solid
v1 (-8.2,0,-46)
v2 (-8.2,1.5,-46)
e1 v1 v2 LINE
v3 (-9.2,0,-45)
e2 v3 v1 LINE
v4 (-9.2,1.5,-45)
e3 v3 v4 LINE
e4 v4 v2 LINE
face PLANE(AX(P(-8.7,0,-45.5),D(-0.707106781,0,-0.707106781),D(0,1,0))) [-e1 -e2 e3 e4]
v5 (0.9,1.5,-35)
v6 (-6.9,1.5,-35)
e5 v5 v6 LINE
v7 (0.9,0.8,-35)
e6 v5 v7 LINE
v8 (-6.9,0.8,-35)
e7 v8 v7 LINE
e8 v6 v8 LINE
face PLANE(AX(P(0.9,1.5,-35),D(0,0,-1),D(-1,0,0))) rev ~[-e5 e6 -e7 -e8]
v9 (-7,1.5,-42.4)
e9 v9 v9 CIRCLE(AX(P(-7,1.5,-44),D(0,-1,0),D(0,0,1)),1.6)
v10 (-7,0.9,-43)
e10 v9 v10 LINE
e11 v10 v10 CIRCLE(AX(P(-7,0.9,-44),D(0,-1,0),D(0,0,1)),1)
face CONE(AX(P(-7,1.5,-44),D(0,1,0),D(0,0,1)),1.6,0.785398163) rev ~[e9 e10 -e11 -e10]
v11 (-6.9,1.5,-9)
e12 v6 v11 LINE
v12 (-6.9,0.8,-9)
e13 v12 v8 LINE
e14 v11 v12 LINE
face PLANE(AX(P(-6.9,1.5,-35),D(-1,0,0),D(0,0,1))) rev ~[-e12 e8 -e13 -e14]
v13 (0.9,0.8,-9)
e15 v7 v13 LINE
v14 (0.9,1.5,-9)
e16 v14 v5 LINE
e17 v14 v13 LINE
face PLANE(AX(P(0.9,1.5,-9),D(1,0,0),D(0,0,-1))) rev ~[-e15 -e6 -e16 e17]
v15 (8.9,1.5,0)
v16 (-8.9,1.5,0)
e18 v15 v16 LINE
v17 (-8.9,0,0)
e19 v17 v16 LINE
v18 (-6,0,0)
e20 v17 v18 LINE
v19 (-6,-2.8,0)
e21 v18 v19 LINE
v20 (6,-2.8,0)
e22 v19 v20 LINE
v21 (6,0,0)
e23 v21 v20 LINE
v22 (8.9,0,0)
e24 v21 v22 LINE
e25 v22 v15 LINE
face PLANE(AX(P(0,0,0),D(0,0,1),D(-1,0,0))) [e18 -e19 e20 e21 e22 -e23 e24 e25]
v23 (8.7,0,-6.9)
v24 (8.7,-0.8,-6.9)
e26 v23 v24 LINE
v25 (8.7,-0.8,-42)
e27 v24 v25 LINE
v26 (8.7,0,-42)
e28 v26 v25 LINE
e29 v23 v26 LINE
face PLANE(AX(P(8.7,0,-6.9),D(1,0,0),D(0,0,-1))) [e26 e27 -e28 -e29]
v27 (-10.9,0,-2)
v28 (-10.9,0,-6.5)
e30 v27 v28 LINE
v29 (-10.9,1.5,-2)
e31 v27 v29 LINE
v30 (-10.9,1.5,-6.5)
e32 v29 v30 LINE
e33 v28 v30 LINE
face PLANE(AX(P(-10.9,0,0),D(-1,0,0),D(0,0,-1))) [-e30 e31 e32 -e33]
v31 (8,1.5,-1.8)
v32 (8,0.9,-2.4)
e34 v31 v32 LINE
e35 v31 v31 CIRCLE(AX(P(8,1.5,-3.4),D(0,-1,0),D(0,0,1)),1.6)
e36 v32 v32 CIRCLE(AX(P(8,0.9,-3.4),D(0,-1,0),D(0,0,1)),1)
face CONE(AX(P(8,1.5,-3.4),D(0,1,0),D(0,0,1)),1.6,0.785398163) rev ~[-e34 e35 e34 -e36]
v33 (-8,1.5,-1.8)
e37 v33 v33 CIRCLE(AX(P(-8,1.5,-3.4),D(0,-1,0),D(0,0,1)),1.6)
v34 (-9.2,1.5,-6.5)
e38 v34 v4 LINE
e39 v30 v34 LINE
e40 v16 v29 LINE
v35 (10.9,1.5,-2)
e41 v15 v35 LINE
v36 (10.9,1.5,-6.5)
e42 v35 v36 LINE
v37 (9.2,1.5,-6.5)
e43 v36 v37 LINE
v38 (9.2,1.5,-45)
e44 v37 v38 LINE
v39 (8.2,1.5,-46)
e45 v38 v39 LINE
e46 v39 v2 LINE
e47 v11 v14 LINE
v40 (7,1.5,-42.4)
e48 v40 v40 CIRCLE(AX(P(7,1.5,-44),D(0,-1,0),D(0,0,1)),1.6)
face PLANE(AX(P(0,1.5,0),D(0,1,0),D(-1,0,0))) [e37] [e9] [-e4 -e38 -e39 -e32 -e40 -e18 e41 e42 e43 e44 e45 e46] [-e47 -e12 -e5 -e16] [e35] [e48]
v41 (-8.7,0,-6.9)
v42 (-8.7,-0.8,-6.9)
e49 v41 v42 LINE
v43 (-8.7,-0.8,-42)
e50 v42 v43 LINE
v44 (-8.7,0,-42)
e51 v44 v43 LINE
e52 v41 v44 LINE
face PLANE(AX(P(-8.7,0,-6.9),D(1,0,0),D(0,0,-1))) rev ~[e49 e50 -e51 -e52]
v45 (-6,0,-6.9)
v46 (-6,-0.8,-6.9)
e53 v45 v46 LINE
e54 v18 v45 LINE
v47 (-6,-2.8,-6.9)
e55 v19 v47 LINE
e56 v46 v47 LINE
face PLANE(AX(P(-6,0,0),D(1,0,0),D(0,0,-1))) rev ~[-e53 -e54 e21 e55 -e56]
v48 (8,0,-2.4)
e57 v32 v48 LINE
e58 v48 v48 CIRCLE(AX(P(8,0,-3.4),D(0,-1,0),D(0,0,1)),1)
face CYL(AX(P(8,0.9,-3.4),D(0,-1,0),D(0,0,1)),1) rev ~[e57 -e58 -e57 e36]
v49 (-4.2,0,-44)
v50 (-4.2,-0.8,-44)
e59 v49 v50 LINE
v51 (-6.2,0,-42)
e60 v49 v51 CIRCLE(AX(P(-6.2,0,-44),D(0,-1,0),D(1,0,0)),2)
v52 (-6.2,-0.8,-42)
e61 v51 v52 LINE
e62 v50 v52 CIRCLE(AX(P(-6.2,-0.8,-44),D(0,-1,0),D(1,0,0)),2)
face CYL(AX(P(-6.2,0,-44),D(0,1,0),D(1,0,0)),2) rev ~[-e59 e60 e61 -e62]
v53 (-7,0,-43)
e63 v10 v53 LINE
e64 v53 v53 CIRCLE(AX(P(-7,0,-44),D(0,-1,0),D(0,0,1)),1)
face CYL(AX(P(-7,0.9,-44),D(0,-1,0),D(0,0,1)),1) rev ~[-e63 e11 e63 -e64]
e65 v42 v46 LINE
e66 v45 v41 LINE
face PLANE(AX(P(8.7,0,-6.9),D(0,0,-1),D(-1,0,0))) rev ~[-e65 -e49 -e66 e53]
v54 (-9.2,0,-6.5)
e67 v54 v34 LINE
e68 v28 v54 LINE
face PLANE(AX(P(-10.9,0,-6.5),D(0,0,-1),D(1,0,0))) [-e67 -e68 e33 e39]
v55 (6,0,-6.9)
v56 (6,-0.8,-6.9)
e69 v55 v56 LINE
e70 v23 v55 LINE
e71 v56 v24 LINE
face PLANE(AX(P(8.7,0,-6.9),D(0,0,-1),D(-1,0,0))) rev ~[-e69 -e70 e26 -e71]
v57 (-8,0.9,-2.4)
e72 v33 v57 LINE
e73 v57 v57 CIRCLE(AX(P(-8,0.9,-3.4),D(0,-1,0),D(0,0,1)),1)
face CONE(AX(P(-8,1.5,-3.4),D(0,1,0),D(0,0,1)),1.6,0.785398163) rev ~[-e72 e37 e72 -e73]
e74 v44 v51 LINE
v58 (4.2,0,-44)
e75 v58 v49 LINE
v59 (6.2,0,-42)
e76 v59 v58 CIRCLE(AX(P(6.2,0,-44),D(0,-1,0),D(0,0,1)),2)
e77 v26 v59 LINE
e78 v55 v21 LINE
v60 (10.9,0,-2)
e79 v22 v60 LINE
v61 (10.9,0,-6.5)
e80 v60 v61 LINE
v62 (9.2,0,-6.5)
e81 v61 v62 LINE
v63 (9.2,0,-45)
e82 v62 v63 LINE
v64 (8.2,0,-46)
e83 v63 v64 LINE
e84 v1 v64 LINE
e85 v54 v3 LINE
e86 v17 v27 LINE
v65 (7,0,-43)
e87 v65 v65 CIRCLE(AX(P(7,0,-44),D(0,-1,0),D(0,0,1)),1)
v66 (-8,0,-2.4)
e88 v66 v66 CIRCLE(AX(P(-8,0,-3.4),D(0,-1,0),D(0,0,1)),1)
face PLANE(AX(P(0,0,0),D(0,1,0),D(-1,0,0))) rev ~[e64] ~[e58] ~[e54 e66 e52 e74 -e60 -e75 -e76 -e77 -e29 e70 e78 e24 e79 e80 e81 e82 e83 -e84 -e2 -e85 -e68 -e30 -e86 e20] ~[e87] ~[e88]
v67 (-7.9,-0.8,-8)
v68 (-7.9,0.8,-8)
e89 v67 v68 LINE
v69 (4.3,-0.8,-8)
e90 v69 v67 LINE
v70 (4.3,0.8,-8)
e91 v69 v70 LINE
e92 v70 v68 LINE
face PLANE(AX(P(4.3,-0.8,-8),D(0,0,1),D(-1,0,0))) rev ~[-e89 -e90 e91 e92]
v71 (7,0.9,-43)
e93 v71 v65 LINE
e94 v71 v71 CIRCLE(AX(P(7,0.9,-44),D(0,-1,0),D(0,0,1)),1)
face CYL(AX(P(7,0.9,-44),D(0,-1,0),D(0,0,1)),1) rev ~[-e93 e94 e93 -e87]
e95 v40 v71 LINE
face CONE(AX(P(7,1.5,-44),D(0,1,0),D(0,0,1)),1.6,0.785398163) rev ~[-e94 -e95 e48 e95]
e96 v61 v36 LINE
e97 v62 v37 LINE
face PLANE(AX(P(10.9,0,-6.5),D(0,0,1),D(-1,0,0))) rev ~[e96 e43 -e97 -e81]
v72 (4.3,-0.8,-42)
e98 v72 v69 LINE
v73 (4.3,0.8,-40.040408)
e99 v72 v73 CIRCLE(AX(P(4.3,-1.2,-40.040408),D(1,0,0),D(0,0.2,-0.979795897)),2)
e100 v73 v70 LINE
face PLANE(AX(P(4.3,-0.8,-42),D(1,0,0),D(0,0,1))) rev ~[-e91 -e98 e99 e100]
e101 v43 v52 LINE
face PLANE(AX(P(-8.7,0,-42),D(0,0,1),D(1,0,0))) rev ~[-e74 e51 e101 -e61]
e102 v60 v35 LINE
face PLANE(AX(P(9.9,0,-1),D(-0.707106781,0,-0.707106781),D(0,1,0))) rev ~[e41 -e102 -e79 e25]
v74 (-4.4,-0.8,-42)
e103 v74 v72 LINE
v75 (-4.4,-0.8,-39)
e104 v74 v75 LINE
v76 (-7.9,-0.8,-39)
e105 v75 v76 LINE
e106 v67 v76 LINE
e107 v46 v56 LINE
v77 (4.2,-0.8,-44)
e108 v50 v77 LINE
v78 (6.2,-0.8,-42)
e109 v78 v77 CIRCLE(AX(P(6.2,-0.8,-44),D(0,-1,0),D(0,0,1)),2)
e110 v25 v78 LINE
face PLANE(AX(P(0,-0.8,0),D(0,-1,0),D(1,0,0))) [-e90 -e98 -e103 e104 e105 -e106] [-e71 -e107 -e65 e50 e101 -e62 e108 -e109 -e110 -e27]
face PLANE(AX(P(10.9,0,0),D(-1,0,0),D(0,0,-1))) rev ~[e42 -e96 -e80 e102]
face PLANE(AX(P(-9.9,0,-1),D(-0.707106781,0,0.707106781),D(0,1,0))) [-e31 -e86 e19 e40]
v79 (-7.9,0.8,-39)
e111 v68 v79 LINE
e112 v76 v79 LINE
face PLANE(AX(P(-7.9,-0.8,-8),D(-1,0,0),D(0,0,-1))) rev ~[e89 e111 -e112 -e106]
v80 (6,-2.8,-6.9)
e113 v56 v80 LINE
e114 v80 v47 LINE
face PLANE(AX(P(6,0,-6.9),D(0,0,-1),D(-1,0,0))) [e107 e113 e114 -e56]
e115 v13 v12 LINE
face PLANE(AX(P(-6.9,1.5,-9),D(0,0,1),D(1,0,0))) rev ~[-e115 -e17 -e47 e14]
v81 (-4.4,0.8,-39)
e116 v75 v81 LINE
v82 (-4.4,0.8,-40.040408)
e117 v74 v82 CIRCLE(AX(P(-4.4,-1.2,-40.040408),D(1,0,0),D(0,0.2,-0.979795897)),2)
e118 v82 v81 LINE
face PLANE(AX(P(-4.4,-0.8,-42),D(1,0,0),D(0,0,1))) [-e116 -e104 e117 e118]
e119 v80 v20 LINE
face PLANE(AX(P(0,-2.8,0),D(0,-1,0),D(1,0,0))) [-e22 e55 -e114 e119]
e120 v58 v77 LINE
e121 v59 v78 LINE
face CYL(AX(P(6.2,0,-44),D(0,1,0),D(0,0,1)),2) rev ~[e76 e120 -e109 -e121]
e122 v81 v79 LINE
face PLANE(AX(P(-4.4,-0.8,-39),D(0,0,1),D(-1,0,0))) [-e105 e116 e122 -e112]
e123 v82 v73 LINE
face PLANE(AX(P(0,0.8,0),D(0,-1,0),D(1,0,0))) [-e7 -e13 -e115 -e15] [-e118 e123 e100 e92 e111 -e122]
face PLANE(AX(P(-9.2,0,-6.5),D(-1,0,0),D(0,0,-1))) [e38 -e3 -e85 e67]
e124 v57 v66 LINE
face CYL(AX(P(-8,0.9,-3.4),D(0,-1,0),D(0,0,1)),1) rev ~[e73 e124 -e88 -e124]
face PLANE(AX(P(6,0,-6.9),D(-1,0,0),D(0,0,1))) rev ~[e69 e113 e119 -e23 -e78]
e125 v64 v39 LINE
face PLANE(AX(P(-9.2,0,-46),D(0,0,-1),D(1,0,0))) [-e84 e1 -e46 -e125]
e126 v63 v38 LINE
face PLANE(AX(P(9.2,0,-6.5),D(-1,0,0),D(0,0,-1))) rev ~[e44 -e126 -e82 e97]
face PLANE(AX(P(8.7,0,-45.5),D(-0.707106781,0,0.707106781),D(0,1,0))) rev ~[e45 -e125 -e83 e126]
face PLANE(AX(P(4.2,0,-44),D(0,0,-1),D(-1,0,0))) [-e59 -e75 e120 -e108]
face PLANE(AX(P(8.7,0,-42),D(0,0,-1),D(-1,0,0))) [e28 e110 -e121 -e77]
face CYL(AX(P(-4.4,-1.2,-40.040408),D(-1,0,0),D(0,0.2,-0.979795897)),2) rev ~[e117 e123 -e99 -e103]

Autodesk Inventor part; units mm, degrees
ref_plane "YZ Plane" through (0, 0, 0) normal (1, 0, 0) x (0, 1, 0)
ref_plane "XZ Plane" through (0, 0, 0) normal (0, 1, 0) x (-1, 0, 0)
ref_plane "XY Plane" through (0, 0, 0) normal (0, 0, 1) x (1, 0, 0)
sketch "Эскиз1" plane through (0, 0, 0) normal (0, 1, 0) x (-1, 0, 0)
  line L0 (0, 0) -> (0, -46)
  line L1 (0, 0) -> (10.9, 0)
  line L2 (10.9, 0) -> (10.9, -6.5)
  line L3 (10.9, -6.5) -> (9.2, -6.5)
  line L4 (9.2, -6.5) -> (9.2, -46)
  line L5 (9.2, -46) -> (0, -46)
  line L6 (0, 0) -> (-10.9, 0)
  line L7 (-10.9, 0) -> (-10.9, -6.5)
  line L8 (-10.9, -6.5) -> (-9.2, -6.5)
  line L9 (-9.2, -6.5) -> (-9.2, -46)
  line L10 (-9.2, -46) -> (0, -46)
  dimension "d1" = 6.5
  dimension "d2" = 46
  dimension "d3" = 18.4
  dimension "d4" = 21.8
extrude "Выдавливание1" add sketch "Эскиз1" along normal blind 1.5
chamfer "Фаска1" distance 2 angle 45 2 edges at (10.9, 0.75, 0) (-10.9, 0.75, 0)
chamfer "Фаска2" distance 1 angle 45 2 edges at (9.2, 0.75, -46) (-9.2, 0.75, -46)
sketch "Эскиз2" plane through (0, 1.5, 0) normal (0, 1, 0) x (1, 0, 0)
  line L0 (0, 0) -> (0, 46)
  line L1 (8.2, 46) -> (-8.2, 46) projected
  line L2 (-8.9, 0) -> (8.9, 0) projected
  point P0 (-8, 3.4)
  point P1 (8, 3.4)
  point P2 (-7, 44)
  point P3 (7, 44)
  dimension "d20" = 3.4
  dimension "d21" = 16
  dimension "d22" = 14
  dimension "d23" = 44
hole "Отверстие1" at (-8, 1.5, -3.4) at (8, 1.5, -3.4) at (-7, 1.5, -44) at (7, 1.5, -44) direction (0, -1, 0) diameter 2 end through all countersink diameter 3.2 countersink angle 90
sketch "Эскиз3" plane through (0, 0, 0) normal (0, -1, 0) x (1, 0, 0)
  line L0 (8.7, -6.9) -> (0, -6.9)
  line L1 (-8.9, 0) -> (8.9, 0) projected
  line L2 (8.7, -6.9) -> (8.7, -42)
  line L3 (10.9, -2) -> (10.9, -6.5) projected
  line L4 (8.7, -42) -> (6.2, -42)
  line L5 (4.2, -44) -> (4.2, -44)
  line L6 (4.2, -44) -> (0, -44)
  line L7 (8.7, -6.9) -> (5.8, -6.9)
  line L8 (0, 0) -> (0, -46)
  line L9 (8.2, -46) -> (-8.2, -46) projected
  arc A0 (6.2, -42) -> (4.2, -44) centre (6.2, -44) ccw
  line L10 (-8.7, -6.9) -> (0, -6.9)
  line L11 (-8.7, -6.9) -> (-8.7, -42)
  line L12 (-8.7, -42) -> (-6.2, -42)
  line L13 (-4.2, -44) -> (-4.2, -44)
  line L14 (-4.2, -44) -> (0, -44)
  line L15 (-8.7, -6.9) -> (-5.8, -6.9)
  arc A1 (-4.2, -44) -> (-6.2, -42) centre (-6.2, -44) ccw
  circle A2 centre (-7, -44) radius 1 projected
  circle A3 centre (-8, -3.4) radius 1 projected
  circle A4 centre (8, -3.4) radius 1 projected
  circle A5 centre (7, -44) radius 1 projected
  line L16 (-8.2, -46) -> (-9.2, -45) projected
  line L17 (8.2, -46) -> (-8.2, -46) projected
  line L18 (9.2, -45) -> (8.2, -46) projected
  line L19 (9.2, -6.5) -> (9.2, -45) projected
  line L20 (10.9, -6.5) -> (9.2, -6.5) projected
  line L21 (10.9, -2) -> (10.9, -6.5) projected
  line L22 (8.9, 0) -> (10.9, -2) projected
  line L23 (-8.9, 0) -> (8.9, 0) projected
  line L24 (-10.9, -2) -> (-8.9, 0) projected
  line L25 (-10.9, -6.5) -> (-10.9, -2) projected
  line L26 (-9.2, -6.5) -> (-10.9, -6.5) projected
  line L27 (-9.2, -45) -> (-9.2, -6.5) projected
  dimension "d24" = 6.9
  dimension "d25" = 2.2
  dimension "d26" = 42
  dimension "d27" = 44
  dimension "d28" = 6.7
  dimension "d30" = 2
extrude "Выдавливание2" add sketch "Эскиз3" along normal blind 0.8 contours L2 L4 A0 L6 L8 L0 | L8 L14 A1 L12 L11 L10
sketch "Эскиз5" plane through (0, -0.8, 0) normal (0, -1, 0) x (1, 0, 0)
  line L0 (-7.9, -42) -> (4.3, -42)
  line L1 (4.3, -42) -> (4.3, -8)
  line L2 (4.3, -8) -> (-7.9, -8)
  line L3 (-7.9, -8) -> (-7.9, -42)
  line L4 (-10.9, -6.5) -> (-10.9, -2) projected
  line L5 (9.2, -6.5) -> (9.2, -45) projected
  line L6 (-8.9, 0) -> (8.9, 0) projected
  line L7 (8.2, -46) -> (-8.2, -46) projected
  line L8 (-4.4, -42) -> (-4.4, -39)
  line L9 (-4.4, -39) -> (-7.9, -39)
  point P0 (0, 0)
  dimension "d33" = 3
  dimension "d35" = 8
  dimension "d36" = 4
  dimension "d40" = 31
  dimension "d41" = 3.5
  dimension "d55" = 12.2
extrude "Выдавливание3" cut sketch "Эскиз5" against normal blind 1.6 contours L8 L9 L3 L2 L1 L0
sketch "Эскиз6" plane through (0, 1.5, 0) normal (0, 1, 0) x (1, 0, 0)
  line L0 (-6.9, 9) -> (0.9, 9)
  line L1 (0.9, 9) -> (0.9, 35)
  line L2 (0.9, 35) -> (-6.9, 35)
  line L3 (-6.9, 35) -> (-6.9, 9)
  line L4 (-8.9, 0) -> (8.9, 0) projected
  line L5 (-9.2, 45) -> (-9.2, 6.5) projected
  line L6 (-10.9, 6.5) -> (-10.9, 2) projected
  line L7 (10.9, 2) -> (10.9, 6.5) projected
  point P0 (0, 0)
  dimension "d43" = 9
  dimension "d45" = 4
  dimension "d46" = 10
  dimension "d47" = 26
extrude "Выдавливание4" cut sketch "Эскиз6" against normal through all
fillet "Сопряжение2" radius 2 1 edges at (-0.05, 0.8, -42)
sketch "Эскиз7" plane through (0, 0, 0) normal (0, -1, 0) x (1, 0, 0)
  line L0 (-8.9, 0) -> (8.9, 0) projected
  line L1 (8.7, -6.9) -> (-8.7, -6.9) projected
  line L2 (6, 0) -> (-6, 0)
  line L3 (-6, 0) -> (-6, -6.9)
  line L4 (-6, -6.9) -> (6, -6.9)
  line L5 (6, -6.9) -> (6, 0)
  point P0 (0, 0)
  point P1 (0, 0)
  dimension "d51" = 12
extrude "Выдавливание5" add sketch "Эскиз7" along normal blind 2.8
properties part number "Case_top_new"
